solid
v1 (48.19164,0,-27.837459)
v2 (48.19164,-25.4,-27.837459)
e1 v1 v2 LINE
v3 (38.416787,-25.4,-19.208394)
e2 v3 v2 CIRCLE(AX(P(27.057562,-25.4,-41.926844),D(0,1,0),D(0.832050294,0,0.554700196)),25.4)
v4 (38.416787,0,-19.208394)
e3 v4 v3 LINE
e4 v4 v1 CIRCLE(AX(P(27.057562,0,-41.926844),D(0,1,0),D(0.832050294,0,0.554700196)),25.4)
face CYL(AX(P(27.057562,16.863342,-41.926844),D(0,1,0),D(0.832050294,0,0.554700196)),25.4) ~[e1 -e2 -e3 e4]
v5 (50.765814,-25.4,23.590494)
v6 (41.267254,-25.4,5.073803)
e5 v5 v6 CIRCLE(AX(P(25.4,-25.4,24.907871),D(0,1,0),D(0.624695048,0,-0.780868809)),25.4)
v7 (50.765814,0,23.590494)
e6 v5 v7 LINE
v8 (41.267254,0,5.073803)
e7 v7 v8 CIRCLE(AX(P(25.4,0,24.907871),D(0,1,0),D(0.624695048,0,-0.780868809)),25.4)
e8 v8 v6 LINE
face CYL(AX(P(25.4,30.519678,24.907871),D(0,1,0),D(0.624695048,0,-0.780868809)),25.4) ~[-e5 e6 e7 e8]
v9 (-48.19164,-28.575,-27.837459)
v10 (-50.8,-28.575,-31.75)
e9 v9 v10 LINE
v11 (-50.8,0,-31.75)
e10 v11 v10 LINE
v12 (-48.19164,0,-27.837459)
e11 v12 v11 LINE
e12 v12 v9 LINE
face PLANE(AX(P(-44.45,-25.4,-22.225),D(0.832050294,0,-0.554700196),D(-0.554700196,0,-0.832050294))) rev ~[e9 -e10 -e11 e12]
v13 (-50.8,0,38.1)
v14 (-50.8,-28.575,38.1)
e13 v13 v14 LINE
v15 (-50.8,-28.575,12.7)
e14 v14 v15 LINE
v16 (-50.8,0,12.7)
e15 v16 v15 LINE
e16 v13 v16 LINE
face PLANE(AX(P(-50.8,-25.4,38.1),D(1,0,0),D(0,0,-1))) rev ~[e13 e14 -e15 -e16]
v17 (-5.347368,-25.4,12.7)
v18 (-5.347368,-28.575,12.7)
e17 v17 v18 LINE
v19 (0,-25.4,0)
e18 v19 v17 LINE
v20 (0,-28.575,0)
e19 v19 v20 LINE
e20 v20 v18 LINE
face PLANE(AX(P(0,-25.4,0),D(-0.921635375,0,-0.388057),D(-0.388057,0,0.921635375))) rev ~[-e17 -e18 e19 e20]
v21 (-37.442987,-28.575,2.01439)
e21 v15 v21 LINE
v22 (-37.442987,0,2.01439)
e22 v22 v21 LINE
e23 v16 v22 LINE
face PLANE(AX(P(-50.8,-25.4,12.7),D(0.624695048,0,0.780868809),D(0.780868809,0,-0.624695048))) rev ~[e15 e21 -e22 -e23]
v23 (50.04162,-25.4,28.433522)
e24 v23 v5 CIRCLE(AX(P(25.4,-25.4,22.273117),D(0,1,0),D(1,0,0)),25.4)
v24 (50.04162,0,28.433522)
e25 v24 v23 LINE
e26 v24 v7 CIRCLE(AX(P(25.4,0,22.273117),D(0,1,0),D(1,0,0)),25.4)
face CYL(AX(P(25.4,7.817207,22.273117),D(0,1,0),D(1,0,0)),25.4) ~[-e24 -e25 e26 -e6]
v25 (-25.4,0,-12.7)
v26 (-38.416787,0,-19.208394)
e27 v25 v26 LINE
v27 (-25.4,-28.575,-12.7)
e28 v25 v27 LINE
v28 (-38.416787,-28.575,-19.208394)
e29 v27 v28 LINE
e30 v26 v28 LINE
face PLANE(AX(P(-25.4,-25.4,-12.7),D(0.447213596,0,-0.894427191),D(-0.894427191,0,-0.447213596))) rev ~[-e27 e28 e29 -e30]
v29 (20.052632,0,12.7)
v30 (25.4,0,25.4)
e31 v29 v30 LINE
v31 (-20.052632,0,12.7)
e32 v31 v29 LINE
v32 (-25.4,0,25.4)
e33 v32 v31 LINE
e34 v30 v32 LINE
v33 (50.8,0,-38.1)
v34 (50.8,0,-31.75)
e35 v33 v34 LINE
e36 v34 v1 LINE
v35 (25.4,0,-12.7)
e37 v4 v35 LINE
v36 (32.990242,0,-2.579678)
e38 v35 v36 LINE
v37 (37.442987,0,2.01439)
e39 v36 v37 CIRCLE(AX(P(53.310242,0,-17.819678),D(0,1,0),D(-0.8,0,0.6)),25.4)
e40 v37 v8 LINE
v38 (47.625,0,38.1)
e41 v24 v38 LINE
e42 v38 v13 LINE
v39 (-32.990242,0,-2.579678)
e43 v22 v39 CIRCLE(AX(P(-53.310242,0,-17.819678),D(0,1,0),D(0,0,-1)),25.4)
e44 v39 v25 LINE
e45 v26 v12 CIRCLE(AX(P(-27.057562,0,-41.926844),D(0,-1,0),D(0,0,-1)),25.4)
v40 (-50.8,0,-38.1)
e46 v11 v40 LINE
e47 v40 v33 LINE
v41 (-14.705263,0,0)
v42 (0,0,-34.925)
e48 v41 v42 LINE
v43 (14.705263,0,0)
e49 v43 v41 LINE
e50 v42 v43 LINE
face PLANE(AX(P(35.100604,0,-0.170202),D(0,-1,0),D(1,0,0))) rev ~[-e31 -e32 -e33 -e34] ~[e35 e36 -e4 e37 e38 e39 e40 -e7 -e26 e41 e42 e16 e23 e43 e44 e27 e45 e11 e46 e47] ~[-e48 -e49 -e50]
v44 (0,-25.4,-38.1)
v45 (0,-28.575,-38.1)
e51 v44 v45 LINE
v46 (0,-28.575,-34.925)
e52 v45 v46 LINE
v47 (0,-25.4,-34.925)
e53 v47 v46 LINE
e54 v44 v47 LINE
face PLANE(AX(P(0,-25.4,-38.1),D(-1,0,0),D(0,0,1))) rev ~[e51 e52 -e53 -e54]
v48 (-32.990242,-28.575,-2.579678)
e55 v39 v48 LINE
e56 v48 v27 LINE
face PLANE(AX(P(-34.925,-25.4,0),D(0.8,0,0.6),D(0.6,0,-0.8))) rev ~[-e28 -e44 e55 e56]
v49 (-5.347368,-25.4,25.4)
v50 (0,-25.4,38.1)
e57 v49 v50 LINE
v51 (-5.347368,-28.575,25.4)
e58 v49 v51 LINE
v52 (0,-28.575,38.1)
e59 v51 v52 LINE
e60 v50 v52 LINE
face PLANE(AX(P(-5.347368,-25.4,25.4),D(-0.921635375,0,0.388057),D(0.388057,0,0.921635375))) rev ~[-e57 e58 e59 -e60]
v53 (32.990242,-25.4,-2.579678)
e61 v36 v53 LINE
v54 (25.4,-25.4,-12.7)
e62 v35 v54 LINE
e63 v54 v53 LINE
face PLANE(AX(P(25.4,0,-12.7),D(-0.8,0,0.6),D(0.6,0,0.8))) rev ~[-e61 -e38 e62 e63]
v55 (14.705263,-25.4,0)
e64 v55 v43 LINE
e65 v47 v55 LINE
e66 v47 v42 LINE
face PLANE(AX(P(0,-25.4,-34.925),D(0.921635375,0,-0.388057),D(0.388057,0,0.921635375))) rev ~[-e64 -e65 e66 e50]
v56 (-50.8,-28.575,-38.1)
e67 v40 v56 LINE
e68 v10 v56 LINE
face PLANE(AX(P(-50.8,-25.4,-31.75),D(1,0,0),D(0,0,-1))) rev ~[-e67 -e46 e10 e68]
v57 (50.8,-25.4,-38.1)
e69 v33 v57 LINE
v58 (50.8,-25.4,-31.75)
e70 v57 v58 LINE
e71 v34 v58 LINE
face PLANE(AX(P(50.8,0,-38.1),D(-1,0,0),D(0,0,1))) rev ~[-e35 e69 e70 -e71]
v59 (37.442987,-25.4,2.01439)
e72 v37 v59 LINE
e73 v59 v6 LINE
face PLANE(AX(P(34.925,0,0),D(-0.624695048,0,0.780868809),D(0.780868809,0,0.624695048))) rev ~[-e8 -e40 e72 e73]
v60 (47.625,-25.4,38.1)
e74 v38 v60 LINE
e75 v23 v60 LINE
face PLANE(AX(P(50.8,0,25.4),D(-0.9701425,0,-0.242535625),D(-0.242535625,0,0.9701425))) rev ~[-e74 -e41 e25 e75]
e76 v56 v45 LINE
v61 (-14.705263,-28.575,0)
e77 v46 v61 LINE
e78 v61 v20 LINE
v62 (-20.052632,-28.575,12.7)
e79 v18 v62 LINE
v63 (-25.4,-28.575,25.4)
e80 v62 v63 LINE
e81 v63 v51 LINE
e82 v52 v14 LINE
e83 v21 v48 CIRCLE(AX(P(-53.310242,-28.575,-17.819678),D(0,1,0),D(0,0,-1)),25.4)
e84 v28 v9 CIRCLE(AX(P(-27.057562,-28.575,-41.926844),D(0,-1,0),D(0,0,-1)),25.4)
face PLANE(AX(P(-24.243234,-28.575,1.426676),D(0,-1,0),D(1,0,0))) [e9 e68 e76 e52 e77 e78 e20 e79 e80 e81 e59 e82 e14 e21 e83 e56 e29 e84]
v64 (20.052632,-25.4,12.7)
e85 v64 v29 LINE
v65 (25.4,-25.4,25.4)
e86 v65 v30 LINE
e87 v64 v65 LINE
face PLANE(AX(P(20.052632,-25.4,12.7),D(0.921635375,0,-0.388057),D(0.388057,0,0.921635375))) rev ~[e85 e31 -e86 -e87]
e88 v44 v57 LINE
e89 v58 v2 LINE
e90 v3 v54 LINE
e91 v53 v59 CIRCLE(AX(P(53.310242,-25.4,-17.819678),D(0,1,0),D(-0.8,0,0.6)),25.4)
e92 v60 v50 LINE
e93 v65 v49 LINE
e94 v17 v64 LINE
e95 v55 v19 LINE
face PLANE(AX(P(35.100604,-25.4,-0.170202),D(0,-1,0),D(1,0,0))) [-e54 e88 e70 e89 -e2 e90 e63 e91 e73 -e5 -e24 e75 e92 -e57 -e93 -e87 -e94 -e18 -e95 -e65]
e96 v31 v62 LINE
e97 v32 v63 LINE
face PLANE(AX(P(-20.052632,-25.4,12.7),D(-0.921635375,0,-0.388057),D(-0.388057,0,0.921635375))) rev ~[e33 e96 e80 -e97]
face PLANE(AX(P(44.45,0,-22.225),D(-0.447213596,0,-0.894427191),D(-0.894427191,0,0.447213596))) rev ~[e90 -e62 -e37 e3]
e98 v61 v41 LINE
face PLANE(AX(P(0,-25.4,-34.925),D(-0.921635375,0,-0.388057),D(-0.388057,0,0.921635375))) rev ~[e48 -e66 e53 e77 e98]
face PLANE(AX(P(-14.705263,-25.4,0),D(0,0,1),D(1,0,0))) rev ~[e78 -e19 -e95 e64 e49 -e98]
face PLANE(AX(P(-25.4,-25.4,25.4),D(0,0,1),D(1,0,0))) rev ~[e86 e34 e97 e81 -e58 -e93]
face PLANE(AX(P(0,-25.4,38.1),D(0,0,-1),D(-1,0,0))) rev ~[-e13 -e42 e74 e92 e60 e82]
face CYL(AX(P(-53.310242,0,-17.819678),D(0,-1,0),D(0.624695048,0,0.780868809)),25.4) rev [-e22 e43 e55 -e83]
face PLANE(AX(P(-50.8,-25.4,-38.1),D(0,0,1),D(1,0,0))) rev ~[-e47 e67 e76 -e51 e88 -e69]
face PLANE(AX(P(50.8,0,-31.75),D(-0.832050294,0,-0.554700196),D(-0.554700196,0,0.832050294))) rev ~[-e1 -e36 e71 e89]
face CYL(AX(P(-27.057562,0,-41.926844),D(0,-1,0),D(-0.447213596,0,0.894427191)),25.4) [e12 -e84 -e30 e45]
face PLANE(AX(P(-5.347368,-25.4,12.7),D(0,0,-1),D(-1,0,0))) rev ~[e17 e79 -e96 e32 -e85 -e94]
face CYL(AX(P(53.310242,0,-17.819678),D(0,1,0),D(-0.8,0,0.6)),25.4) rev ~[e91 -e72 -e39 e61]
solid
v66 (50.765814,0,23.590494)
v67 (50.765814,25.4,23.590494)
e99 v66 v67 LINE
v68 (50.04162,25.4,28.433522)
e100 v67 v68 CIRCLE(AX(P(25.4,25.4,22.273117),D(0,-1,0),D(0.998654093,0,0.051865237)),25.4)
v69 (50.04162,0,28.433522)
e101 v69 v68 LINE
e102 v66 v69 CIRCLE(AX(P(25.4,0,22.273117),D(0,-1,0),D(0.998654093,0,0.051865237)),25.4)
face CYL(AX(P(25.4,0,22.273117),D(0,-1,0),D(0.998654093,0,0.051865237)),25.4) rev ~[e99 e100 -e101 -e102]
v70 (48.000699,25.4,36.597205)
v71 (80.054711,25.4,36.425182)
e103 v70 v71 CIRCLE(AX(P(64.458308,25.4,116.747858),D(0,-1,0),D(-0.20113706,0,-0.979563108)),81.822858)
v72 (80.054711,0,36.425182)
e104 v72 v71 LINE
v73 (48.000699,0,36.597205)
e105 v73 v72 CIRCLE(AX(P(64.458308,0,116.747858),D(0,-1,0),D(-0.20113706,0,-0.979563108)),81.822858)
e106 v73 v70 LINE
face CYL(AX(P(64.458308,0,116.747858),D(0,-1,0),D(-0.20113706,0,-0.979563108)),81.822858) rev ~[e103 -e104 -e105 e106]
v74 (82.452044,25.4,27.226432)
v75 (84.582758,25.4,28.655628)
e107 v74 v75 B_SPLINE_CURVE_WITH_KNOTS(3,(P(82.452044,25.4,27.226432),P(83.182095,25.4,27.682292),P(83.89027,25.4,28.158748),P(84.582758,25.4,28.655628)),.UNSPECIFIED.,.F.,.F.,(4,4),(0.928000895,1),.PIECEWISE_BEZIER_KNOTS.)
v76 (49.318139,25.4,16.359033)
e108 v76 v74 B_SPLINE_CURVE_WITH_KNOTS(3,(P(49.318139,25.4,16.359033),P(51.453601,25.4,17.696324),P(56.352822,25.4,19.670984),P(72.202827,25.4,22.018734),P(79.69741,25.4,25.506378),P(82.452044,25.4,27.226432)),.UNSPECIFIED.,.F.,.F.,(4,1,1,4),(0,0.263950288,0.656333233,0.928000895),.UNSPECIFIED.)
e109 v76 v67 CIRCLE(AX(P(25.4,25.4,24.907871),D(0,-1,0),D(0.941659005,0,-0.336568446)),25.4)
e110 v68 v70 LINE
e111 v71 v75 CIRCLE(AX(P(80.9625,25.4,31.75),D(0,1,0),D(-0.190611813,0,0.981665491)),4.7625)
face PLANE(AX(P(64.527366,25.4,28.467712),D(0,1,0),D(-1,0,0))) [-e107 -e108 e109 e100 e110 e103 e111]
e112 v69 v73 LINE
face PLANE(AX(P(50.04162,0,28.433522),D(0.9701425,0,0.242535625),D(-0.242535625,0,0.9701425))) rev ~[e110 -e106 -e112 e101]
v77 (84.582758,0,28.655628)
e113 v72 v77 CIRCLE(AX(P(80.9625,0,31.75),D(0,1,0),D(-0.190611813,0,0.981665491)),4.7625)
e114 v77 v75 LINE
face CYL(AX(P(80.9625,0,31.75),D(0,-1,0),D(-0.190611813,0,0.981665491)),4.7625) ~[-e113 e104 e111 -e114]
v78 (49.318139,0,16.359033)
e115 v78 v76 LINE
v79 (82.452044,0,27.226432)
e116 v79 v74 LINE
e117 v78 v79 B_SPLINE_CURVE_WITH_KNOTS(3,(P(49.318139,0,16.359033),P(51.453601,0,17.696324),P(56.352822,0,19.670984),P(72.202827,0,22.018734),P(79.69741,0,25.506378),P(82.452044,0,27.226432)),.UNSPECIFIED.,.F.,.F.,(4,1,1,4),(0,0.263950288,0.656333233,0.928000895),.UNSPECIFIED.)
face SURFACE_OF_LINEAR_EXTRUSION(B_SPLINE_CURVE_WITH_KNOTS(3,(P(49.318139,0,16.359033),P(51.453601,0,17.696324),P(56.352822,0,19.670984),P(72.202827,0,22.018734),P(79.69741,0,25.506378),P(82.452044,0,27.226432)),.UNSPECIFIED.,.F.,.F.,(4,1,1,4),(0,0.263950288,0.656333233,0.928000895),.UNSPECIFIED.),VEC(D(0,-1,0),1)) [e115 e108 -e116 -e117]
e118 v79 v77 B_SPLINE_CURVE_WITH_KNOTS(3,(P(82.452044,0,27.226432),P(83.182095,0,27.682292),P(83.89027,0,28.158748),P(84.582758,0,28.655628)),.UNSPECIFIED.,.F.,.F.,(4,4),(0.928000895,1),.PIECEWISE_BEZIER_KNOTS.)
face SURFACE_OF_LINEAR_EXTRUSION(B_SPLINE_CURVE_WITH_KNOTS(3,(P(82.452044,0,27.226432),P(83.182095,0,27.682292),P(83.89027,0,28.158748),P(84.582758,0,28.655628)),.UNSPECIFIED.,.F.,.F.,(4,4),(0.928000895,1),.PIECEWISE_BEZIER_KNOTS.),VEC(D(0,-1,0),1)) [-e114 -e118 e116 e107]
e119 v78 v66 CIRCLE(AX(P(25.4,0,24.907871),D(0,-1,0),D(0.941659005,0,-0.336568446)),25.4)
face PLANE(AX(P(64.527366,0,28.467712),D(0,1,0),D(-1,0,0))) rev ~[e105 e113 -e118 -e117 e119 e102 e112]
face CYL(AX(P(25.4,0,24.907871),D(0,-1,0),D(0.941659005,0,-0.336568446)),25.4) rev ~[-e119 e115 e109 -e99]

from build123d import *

# Parameters (mm, degrees)
F1_DEPTH    = 25.4
F2_T1_DEPTH = 25.4
F2_T3_DEPTH = 41.0344144534
F2_T5_DEPTH = 86.4393556308
F2_T7_DEPTH = 59.1266835085
F4_DEPTH    = 25.4
F6_DEPTH    = 50.8010001
F8_DEPTH    = 3.175
F9_R        = 25.4


# Not quite as in the source:
# - a fillet or chamfer that OpenCascade refuses, or shapes differently, is made with other operations: its cross-section is extruded or revolved along the edge and cut away or added


with BuildPart() as f1:
    # F0 (on Front) → F1 (new body)
    with BuildSketch(Plane.XZ):
        Polygon((-50.8, -38.1), (50.8, -38.1), (50.8, -31.75), (44.45, -22.225), (25.4, -12.7), (34.925, 0), (50.8, 12.7), (50.8, 25.4), (47.625, 38.1), (-50.8, 38.1), (-50.8, 12.7), (-34.925, 0), (-25.4, -12.7), (-44.45, -22.225), (-50.8, -31.75), align=None)
    extrude(amount=F1_DEPTH)

    # F2: fillet of radius 25.4 on 4 edges, made by hand

    # F2_s2 → F2_t1 (join)
    with BuildSketch(Plane.XZ):
        with BuildLine():
            ThreePointArc((32.9902416385, -2.5796778154), (35.0713900731, -0.1418868454), (37.4429874306, 2.0143899445))
            Line((37.4429874306, 2.0143899445), (34.925, 0))
            Line((34.925, 0), (32.9902416385, -2.5796778154))
        make_face()
    extrude(amount=F2_T1_DEPTH)

    # F2_s4 → F2_t3 (cut)
    with BuildSketch(Plane.XZ.offset(-7.8172072267)):
        with BuildLine():
            ThreePointArc((50.8, 22.2731171093), (50.6096919397, 25.3765720072), (50.0416195037, 28.4335219852))
            Line((50.0416195037, 28.4335219852), (50.8, 25.4))
            Line((50.8, 25.4), (50.8, 22.2731171093))
        make_face()
    extrude(amount=F2_T3_DEPTH, mode=Mode.SUBTRACT)

    # F2_s6 → F2_t5 (cut)
    with BuildSketch(Plane.XZ.offset(-30.5196778154)):
        with BuildLine():
            ThreePointArc((41.2672542079, 5.0738033663), (48.2931022022, 13.9048773717), (50.8, 24.9078711262))
            Line((50.8, 24.9078711262), (50.8, 12.7))
            Line((50.8, 12.7), (41.2672542079, 5.0738033663))
        make_face()
    extrude(amount=F2_T5_DEPTH, mode=Mode.SUBTRACT)

    # F2_s8 → F2_t7 (cut)
    with BuildSketch(Plane.XZ.offset(-16.8633417542)):
        with BuildLine():
            ThreePointArc((48.191639592, -27.8374593881), (43.867347222, -22.8850187065), (38.4167874416, -19.2083937208))
            Line((38.4167874416, -19.2083937208), (44.45, -22.225))
            Line((44.45, -22.225), (48.191639592, -27.8374593881))
        make_face()
    extrude(amount=F2_T7_DEPTH, mode=Mode.SUBTRACT)

    # F5 (on face) → F6 (cut, through all)
    with BuildSketch(Plane.XZ.offset(25.4)):
        Polygon((25.4, 25.4), (-25.4, 25.4), (-20.0526315789, 12.7), (20.0526315789, 12.7), align=None)
        Polygon((14.7052631579, 0), (-14.7052631579, 0), (0, -34.925), align=None)
    extrude(amount=-F6_DEPTH, mode=Mode.SUBTRACT)

    # F7 (on face) → F8 (join)
    with BuildSketch(Plane.XZ.offset(25.4)):
        Polygon((-14.7052631579, 0), (0, 0), (-5.3473684211, 12.7), (-20.0526315789, 12.7), (-25.4, 25.4), (-5.3473684211, 25.4), (0, 38.1), (-50.8, 38.1), (-50.8, 12.7), (-34.925, 0), (-25.4, -12.7), (-44.45, -22.225), (-50.8, -31.75), (-50.8, -38.1), (0, -38.1), (0, -34.925), align=None)
    extrude(amount=F8_DEPTH)

    # F9
    f9_edges = [f1.edges().sort_by_distance(p)[0] for p in [
        (-34.925, -14.2875, 0),
        (-44.45, -14.2875, -22.225),
    ]]
    fillet(f9_edges, radius=F9_R)


with BuildPart() as f4:
    # F3 (on face) → F4 (new body)
    with BuildSketch(Plane(origin=(0, 0, 0), x_dir=(-1, 0, 0), z_dir=(0, 1, 0))):
        with BuildLine():
            ThreePointArc((-48.0006987759, 36.5972048963), (-64.0191987714, 34.9261782663), (-80.0547112422, 36.4251819025))
            ThreePointArc((-80.0547112422, 36.4251819025), (-85.0772133008, 34.1480285032), (-84.5827576486, 28.6556275583))
            add(Edge.make_bspline(
                [(-82.4520441677, 27.2264323347), (-83.1820950721, 27.6822920244), (-83.8902700056, 28.1587482087), (-84.5827576486, 28.6556275583)],
                knots=[0.9280008954, 0.9280008954, 0.9280008954, 0.9280008954, 1, 1, 1, 1], degree=3))
            add(Edge.make_bspline(
                [(-49.3181387168, 16.3590325895), (-51.4536007413, 17.6963242827), (-56.3528215031, 19.6709837112), (-72.2028273002, 22.0187338367), (-79.6974095968, 25.5063784956), (-82.4520441677, 27.2264323347)],
                knots=[0, 0, 0, 0, 0.2639502882, 0.6563332329, 0.9280008954, 0.9280008954, 0.9280008954, 0.9280008954], degree=3))
            ThreePointArc((-49.3181387168, 16.3590325895), (-50.3058327868, 19.9219416041), (-50.7658139593, 23.5904941174))
            ThreePointArc((-50.7658139593, 23.5904941174), (-50.5207002315, 26.0295009926), (-50.0416195037, 28.4335219852))
            Line((-50.0416195037, 28.4335219852), (-48.0006987759, 36.5972048963))
        make_face()
    extrude(amount=F4_DEPTH)


solid = Compound([f1.part, f4.part])
